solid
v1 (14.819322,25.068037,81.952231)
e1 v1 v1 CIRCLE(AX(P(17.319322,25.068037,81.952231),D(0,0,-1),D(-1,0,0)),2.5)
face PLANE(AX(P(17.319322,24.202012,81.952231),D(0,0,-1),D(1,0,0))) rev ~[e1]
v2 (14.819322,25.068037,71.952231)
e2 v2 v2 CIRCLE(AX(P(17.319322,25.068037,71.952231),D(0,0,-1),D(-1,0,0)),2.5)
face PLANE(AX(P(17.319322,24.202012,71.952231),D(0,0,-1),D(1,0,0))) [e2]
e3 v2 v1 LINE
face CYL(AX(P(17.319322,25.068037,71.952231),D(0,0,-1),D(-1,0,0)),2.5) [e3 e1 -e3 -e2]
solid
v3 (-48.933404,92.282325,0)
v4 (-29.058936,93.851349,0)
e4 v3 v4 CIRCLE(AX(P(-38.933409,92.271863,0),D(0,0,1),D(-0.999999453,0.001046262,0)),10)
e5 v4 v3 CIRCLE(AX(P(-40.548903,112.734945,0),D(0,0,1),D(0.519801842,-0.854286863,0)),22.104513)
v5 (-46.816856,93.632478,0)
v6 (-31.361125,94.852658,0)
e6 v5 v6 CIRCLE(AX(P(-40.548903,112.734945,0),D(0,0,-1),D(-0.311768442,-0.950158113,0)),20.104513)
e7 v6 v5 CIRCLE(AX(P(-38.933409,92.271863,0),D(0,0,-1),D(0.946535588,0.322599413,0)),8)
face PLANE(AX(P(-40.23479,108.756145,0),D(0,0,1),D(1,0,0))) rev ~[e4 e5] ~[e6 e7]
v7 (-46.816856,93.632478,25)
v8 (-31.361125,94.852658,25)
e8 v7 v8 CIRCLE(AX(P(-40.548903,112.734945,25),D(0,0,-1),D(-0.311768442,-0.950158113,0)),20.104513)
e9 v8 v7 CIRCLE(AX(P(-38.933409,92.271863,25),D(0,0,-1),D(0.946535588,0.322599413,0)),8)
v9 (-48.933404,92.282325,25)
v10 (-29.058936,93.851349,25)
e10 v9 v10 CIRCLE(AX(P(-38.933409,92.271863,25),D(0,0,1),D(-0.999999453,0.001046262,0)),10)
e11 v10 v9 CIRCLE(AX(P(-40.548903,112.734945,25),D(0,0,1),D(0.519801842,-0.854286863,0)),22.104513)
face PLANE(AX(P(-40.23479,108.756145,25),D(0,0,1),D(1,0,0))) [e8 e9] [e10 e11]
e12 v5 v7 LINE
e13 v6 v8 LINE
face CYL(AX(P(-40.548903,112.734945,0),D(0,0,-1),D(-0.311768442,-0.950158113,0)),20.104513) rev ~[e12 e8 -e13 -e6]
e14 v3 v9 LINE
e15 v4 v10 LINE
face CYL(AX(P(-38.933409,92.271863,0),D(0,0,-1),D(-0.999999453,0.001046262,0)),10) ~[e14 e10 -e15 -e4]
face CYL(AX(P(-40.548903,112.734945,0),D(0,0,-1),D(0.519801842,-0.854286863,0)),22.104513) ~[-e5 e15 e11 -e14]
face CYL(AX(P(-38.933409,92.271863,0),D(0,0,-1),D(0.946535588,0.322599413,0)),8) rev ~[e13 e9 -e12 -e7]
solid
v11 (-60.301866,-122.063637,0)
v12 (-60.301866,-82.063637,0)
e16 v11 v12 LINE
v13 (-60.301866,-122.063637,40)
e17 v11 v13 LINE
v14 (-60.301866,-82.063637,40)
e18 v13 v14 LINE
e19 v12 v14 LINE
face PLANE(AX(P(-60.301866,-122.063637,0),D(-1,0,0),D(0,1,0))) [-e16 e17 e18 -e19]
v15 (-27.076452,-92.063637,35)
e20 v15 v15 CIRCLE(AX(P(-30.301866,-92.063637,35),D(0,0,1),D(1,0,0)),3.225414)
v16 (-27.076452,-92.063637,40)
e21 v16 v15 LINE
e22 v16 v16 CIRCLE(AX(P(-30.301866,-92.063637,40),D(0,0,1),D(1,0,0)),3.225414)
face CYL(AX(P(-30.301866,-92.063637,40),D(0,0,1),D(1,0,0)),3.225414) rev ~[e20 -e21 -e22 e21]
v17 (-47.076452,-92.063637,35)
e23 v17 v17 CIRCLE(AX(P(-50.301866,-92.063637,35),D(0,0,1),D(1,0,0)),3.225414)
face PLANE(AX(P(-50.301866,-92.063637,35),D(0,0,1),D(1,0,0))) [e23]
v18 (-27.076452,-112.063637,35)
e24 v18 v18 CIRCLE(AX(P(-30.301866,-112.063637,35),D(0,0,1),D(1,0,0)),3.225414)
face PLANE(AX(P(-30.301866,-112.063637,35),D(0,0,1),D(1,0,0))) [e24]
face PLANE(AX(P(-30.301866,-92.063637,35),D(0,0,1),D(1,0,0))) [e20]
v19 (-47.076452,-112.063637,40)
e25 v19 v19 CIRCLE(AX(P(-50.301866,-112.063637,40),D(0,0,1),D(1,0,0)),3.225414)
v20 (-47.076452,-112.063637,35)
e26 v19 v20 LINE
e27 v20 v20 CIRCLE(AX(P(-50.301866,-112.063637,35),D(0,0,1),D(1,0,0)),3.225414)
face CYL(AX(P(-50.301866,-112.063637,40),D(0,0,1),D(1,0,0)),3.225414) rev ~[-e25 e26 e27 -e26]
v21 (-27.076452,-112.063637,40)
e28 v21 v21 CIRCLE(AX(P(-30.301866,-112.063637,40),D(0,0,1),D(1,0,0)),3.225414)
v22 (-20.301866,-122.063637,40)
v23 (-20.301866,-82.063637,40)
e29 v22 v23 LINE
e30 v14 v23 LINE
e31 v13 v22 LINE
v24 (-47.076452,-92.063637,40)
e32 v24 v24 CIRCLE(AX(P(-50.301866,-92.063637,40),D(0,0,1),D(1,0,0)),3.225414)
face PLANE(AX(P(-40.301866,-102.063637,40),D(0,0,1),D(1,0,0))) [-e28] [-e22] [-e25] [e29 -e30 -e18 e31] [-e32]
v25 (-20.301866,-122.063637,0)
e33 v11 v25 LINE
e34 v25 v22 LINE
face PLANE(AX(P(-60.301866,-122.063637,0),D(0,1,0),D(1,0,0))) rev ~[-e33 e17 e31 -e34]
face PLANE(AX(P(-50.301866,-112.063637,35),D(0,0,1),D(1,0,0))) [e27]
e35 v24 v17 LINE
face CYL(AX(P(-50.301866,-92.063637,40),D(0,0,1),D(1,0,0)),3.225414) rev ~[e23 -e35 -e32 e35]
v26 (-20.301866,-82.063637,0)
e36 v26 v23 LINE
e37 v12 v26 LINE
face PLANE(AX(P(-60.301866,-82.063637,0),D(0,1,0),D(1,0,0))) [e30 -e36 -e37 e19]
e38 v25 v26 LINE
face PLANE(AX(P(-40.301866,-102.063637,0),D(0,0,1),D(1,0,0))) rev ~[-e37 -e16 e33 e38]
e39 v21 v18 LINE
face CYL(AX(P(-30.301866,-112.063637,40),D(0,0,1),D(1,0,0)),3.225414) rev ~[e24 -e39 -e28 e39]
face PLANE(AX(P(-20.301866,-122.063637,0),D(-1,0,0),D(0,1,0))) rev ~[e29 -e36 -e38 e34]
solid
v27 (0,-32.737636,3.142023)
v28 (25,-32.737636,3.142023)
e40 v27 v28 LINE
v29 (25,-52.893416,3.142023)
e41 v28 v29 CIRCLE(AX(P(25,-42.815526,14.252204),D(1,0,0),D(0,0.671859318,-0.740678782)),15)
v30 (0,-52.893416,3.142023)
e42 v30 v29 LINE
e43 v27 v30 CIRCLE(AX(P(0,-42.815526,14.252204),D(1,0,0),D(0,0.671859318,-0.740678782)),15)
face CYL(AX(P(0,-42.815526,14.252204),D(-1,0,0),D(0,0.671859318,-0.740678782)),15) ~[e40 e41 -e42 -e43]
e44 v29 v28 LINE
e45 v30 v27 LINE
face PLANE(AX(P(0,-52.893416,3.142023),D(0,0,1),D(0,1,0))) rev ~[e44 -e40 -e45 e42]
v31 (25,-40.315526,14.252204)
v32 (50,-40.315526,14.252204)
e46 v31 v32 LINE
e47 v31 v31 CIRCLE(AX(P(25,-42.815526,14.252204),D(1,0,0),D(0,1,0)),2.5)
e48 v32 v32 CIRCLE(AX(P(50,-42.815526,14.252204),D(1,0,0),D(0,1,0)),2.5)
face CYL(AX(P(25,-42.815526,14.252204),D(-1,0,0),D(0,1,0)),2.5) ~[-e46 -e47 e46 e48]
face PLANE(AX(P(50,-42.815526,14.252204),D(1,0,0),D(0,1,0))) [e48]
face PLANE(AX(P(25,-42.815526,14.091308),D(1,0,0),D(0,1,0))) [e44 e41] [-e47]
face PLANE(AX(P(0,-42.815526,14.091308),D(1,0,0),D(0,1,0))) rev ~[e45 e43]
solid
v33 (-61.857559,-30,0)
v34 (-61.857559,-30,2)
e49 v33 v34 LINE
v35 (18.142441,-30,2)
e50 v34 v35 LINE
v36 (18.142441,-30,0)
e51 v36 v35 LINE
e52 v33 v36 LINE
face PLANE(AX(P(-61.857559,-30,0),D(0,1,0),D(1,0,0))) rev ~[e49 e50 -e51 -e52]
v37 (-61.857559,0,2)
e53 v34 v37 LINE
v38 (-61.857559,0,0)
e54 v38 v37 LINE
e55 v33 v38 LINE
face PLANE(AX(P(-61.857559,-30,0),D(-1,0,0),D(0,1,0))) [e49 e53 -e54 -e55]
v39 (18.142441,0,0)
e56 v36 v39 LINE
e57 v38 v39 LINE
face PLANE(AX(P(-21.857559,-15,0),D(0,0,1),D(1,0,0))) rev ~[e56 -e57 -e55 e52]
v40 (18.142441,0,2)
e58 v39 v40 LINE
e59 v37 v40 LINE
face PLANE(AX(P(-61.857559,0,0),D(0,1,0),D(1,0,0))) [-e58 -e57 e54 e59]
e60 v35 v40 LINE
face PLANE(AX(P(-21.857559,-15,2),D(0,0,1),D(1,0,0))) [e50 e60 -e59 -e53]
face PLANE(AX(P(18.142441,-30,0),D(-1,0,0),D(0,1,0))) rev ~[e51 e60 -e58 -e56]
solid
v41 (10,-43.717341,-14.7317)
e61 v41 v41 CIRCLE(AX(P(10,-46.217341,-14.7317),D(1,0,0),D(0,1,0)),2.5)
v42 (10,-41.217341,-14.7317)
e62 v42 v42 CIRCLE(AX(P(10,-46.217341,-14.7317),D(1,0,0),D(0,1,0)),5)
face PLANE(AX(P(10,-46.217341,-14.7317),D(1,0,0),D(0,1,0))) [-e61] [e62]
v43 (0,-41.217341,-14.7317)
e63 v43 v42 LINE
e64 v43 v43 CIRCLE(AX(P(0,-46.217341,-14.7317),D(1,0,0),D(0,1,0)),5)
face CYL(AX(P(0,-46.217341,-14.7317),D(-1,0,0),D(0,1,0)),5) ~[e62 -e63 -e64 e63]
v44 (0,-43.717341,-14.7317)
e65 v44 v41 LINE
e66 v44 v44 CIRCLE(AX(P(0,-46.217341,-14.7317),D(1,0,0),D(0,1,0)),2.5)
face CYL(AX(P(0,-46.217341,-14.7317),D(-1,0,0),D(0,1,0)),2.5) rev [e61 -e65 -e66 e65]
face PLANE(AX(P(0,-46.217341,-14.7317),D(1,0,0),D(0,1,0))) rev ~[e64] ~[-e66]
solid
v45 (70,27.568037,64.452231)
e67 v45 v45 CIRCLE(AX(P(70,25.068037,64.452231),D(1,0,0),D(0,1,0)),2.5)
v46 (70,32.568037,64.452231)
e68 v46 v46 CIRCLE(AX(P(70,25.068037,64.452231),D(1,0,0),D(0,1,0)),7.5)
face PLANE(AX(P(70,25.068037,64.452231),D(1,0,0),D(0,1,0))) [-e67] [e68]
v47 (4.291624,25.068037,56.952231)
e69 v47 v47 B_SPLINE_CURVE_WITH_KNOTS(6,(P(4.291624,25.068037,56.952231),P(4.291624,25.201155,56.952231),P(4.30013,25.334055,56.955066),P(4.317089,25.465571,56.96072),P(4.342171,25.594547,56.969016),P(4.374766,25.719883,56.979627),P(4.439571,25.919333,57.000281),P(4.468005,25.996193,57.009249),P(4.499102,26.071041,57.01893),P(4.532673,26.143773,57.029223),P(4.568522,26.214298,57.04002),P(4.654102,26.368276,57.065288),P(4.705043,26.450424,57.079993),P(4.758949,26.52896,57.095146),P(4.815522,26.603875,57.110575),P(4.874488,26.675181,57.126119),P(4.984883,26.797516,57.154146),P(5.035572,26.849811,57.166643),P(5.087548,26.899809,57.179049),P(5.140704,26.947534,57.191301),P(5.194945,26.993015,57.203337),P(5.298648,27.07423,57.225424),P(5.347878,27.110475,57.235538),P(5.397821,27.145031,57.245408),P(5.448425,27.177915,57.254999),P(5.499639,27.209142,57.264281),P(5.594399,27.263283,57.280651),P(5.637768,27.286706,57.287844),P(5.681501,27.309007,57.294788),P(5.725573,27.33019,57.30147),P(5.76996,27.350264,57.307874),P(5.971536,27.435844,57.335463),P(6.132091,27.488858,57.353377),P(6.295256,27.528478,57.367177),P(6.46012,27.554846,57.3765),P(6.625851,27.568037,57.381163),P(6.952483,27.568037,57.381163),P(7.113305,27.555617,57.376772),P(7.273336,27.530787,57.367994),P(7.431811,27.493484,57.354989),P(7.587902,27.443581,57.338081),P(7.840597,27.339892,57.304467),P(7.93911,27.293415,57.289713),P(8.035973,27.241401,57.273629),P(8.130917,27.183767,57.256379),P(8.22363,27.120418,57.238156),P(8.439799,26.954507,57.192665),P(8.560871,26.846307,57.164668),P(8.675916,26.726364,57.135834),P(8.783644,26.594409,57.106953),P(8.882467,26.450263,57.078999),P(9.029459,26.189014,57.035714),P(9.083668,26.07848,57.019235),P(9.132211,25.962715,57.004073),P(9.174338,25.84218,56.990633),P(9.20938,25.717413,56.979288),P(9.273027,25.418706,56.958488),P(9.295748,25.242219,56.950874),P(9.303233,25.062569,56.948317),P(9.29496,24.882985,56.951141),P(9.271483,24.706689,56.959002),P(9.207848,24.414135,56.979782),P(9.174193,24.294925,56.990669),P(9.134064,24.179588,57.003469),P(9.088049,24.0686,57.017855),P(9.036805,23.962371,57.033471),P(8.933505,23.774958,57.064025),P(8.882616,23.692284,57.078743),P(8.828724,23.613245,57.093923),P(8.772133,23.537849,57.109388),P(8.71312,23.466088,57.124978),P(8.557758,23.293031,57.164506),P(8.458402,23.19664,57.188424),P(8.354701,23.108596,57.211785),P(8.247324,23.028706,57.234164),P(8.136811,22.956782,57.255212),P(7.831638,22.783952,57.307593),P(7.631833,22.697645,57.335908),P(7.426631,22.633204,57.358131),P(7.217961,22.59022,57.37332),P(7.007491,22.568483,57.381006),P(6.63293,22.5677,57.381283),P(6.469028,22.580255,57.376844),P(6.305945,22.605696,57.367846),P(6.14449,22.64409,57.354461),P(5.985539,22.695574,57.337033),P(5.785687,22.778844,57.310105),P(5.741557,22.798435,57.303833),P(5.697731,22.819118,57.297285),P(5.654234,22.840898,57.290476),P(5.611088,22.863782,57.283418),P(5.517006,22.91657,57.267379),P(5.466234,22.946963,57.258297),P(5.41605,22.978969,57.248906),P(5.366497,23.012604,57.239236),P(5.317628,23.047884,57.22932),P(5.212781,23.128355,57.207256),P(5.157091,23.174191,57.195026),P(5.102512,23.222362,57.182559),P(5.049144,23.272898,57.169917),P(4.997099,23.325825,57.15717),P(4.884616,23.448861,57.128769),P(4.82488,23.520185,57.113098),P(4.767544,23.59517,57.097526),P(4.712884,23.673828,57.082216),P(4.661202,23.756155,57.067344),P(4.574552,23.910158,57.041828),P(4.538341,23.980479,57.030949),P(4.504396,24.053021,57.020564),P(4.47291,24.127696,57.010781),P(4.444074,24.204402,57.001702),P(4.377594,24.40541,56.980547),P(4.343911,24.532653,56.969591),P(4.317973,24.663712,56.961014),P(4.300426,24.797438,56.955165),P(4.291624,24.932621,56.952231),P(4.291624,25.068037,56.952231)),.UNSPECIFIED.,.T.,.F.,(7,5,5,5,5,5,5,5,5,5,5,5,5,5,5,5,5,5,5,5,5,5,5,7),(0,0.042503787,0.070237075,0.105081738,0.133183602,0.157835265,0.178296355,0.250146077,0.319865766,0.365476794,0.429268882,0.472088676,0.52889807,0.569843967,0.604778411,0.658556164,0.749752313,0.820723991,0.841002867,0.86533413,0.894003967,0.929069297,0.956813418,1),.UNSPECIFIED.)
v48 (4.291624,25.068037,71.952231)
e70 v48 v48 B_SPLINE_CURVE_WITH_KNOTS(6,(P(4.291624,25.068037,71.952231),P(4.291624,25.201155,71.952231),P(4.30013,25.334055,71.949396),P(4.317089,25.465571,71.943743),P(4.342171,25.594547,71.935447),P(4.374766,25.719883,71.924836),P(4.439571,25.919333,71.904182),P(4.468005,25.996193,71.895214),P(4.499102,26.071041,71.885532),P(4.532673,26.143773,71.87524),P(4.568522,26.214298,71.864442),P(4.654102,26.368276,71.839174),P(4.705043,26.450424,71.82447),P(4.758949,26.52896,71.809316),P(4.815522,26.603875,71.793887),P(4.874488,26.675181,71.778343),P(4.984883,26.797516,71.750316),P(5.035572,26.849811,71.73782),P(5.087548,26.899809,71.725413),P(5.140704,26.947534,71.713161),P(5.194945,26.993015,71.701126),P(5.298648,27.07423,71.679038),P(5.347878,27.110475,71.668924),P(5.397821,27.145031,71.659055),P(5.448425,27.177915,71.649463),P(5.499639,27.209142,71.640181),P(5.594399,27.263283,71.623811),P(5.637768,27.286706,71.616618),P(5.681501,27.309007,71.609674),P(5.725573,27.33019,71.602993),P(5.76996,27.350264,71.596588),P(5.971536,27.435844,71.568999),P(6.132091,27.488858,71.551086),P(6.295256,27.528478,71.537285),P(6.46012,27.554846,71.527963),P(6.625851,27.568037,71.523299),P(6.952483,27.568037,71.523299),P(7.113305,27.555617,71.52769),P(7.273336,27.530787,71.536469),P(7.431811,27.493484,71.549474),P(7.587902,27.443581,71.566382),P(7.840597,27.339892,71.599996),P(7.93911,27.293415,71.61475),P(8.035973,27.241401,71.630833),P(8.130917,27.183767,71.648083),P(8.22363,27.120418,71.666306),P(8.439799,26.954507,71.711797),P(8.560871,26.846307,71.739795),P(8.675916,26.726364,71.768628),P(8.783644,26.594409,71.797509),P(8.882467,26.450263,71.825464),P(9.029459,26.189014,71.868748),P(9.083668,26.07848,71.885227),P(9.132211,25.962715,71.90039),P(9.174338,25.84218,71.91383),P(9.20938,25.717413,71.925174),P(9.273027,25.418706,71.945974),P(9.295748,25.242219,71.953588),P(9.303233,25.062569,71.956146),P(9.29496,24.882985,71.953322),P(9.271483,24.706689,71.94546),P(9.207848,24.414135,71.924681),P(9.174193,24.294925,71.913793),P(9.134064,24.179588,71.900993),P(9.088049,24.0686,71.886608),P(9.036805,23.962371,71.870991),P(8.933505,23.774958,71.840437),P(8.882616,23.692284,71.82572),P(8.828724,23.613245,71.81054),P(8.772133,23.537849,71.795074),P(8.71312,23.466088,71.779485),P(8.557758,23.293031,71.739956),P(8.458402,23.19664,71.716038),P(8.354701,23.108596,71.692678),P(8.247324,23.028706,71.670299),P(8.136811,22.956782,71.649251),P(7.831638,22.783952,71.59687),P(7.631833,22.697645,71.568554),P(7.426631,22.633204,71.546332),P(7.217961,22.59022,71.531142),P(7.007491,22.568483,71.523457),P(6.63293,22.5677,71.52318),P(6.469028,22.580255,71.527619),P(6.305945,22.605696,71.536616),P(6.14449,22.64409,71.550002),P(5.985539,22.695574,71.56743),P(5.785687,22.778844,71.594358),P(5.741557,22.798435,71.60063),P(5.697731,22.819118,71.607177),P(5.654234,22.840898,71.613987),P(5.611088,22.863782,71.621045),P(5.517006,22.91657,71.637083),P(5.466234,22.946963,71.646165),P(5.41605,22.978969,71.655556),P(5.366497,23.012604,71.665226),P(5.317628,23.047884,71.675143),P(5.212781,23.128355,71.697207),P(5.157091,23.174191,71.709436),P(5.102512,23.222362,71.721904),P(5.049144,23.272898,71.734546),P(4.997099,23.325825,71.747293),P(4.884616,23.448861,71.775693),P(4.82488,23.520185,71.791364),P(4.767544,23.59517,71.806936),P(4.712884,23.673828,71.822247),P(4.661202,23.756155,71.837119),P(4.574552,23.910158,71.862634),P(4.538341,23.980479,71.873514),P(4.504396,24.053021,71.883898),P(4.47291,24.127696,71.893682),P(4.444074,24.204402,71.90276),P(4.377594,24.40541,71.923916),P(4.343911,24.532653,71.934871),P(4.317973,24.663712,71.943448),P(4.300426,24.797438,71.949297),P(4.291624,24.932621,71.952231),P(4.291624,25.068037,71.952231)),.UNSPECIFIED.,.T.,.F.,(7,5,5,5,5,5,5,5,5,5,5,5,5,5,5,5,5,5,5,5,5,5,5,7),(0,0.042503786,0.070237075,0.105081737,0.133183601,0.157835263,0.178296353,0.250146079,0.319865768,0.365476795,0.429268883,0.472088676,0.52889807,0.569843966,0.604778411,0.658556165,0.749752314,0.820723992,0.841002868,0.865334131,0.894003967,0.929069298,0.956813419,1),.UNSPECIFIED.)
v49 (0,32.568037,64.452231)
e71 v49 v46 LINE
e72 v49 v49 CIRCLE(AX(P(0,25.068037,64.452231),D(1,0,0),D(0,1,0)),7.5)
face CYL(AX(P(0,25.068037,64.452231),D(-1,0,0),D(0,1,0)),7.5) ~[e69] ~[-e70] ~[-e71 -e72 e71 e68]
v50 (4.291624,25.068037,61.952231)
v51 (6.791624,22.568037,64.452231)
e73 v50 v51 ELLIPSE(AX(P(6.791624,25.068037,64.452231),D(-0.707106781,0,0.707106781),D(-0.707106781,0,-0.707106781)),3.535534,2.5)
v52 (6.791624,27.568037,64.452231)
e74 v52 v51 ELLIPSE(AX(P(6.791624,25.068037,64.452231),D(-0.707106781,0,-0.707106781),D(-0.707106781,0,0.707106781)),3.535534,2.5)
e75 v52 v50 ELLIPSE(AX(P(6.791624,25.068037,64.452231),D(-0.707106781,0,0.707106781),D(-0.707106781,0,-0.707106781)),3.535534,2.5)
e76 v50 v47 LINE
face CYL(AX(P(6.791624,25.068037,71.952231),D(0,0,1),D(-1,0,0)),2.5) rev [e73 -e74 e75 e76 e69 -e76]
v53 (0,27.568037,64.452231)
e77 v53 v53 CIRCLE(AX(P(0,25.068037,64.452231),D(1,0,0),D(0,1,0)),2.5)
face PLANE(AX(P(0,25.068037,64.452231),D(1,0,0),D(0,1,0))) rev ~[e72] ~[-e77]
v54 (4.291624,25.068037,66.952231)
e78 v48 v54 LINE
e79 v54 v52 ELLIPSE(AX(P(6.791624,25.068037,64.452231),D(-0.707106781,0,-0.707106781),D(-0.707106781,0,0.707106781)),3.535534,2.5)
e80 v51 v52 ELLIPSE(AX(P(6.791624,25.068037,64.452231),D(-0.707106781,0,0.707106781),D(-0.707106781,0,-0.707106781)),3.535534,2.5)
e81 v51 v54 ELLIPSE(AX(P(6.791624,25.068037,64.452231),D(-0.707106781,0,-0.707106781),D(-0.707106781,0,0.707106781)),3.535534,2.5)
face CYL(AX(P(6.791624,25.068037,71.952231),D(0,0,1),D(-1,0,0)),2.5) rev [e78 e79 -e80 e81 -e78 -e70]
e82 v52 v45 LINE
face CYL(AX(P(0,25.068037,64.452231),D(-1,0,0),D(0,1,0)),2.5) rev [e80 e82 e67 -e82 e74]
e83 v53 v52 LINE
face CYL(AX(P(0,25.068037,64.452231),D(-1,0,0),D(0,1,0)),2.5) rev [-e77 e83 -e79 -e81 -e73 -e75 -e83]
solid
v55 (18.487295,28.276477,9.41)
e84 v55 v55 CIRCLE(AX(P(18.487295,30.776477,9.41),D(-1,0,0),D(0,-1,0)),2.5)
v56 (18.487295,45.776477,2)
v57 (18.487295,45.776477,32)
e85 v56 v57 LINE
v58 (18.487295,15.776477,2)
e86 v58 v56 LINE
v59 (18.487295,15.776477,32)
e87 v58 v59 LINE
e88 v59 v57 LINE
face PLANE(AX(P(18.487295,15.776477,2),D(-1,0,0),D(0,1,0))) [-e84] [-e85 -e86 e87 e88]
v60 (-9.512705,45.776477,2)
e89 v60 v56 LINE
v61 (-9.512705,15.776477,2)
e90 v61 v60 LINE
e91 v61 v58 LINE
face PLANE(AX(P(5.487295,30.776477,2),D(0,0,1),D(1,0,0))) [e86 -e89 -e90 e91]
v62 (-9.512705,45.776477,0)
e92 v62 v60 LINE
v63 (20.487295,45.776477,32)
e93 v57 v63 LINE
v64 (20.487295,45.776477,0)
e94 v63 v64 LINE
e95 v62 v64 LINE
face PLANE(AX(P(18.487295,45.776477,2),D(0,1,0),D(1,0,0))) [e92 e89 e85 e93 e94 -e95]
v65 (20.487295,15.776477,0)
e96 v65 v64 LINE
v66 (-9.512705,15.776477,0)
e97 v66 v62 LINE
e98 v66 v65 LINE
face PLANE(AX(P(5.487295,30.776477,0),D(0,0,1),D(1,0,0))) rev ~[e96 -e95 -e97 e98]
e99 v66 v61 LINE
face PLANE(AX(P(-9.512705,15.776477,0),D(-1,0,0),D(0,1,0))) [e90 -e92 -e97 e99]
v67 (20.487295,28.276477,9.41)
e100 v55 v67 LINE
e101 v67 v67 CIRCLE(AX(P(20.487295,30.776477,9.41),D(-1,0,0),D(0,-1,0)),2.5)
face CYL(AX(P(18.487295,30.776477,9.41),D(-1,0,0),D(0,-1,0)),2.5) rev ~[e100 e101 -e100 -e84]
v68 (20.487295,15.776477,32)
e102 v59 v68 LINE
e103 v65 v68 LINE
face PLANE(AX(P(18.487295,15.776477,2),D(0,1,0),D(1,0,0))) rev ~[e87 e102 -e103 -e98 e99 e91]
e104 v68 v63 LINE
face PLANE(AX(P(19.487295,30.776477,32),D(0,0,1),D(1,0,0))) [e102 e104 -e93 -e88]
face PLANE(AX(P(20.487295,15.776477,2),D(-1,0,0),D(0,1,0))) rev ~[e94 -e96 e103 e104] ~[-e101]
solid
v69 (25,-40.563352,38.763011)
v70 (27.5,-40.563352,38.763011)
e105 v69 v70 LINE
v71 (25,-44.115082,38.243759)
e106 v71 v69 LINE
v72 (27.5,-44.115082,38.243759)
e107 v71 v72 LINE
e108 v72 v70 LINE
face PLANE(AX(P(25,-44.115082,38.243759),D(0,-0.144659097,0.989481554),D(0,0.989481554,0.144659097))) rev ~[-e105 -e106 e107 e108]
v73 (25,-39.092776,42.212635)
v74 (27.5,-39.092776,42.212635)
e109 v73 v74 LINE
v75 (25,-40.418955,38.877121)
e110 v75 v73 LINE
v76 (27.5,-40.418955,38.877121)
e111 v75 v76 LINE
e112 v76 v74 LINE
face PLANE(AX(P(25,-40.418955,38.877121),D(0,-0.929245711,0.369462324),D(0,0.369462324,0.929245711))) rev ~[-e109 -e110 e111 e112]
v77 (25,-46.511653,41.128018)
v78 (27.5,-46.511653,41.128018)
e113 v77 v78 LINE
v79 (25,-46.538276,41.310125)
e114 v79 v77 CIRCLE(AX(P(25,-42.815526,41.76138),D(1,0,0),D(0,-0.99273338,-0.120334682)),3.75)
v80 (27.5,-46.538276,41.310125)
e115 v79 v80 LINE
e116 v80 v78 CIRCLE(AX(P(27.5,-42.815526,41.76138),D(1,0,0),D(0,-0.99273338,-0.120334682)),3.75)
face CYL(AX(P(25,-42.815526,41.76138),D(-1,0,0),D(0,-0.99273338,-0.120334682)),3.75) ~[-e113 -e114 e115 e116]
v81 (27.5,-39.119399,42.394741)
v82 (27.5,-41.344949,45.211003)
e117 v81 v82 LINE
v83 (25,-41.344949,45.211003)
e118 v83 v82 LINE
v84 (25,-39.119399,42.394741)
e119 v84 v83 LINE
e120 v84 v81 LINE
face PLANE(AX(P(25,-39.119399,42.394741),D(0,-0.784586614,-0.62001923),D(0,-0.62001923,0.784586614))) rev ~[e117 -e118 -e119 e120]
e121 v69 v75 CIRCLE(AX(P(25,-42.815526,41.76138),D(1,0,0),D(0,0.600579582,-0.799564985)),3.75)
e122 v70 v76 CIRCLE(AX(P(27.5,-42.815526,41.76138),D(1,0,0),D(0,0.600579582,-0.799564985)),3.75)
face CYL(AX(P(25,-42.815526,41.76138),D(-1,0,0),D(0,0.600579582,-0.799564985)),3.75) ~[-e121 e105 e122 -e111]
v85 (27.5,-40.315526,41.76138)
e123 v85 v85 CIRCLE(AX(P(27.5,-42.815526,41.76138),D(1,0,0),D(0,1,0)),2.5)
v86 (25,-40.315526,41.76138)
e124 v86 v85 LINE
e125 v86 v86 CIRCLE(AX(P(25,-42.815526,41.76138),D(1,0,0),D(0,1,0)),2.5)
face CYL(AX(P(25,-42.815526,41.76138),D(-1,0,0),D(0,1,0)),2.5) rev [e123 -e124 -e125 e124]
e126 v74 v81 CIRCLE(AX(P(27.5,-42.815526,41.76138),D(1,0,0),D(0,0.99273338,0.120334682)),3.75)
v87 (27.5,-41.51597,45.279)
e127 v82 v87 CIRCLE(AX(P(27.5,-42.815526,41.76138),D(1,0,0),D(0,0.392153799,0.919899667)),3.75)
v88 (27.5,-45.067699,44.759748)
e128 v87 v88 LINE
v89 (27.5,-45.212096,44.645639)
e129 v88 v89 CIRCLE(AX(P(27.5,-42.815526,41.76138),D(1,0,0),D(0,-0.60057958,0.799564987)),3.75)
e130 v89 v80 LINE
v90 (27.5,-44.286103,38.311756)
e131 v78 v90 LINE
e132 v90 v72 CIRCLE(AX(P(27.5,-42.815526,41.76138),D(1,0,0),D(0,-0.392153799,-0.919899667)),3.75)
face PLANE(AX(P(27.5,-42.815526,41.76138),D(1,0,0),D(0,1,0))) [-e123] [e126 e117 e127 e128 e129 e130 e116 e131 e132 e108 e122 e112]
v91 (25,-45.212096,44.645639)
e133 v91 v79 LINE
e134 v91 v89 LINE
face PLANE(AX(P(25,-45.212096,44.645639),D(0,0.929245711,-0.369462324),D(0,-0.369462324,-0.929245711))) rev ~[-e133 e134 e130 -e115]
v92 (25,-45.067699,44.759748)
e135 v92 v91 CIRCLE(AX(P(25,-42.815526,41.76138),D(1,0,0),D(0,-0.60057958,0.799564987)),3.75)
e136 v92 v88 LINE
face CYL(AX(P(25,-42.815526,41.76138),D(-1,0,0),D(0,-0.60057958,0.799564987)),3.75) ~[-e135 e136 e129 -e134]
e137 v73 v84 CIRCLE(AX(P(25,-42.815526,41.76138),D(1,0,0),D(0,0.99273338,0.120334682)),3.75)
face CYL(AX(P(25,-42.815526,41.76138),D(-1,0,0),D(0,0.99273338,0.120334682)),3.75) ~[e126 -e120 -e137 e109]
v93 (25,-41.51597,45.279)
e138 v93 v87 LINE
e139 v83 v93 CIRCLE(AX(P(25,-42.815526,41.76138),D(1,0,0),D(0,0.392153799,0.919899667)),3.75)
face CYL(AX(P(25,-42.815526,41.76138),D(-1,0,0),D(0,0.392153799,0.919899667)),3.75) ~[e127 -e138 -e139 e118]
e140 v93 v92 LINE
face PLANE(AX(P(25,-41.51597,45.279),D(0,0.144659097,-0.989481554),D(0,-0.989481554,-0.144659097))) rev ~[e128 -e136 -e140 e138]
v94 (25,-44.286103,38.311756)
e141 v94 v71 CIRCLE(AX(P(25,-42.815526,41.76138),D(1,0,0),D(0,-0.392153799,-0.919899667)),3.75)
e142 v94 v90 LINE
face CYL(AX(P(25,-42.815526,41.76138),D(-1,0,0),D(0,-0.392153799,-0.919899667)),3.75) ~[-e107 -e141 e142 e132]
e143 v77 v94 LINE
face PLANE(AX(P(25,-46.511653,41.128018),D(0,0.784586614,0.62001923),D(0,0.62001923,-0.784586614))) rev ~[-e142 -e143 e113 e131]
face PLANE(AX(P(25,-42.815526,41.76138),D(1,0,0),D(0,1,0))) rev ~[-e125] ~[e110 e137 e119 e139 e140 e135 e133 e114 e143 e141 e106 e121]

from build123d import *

# Parameters (mm, degrees)
F0_W      = 30
F0_H      = 30
F1_DEPTH  = 2
F2_W      = 2
F2_H      = 30
F3_DEPTH  = 30
F5_DEPTH  = 25
F6_R      = 2.5
F7_DEPTH  = 25
F8_R      = 2.5
F9_DEPTH  = 2
F0_W_2    = 80
F10_DEPTH = 2
F12_DEPTH = 2.5
F4_R      = 5
F4_R_2    = 2.5
F13_DEPTH = 10
F14_DEPTH = 25
F0_W_3    = 40
F0_H_2    = 40
F15_DEPTH = 40
F16_R     = 3.2254140047
F17_DEPTH = 5
F18_R     = 2.5
F19_DEPTH = 70
F22_DEPTH = 91.6849308292
F23_DEPTH = 10


# Not quite as in the source:
# - a feature names something its author has since deleted; it is built from what else it names


with BuildPart() as f1:
    # F0 (on Top) → F1 (new body)
    with BuildSketch(Plane.XY):
        with Locations((5.4872950528, 30.7764774188)):
            Rectangle(F0_W, F0_H)
    extrude(amount=F1_DEPTH)

    # F2 (on face) → F3 (join)
    with BuildSketch(Plane.XY.offset(2)):
        with Locations((19.4872950528, 30.7764774188)):
            Rectangle(F2_W, F2_H)
    extrude(amount=F3_DEPTH)

    # F8 (on face) → F9 (cut, through all)
    with BuildSketch(Plane(origin=(18.4872950528, 0, 0), x_dir=(0, -1, 0), z_dir=(-1, 0, 0))):
        with Locations((-30.7764774188, 9.41)):
            Circle(F8_R)
    extrude(amount=-F9_DEPTH, mode=Mode.SUBTRACT)


with BuildPart() as f5:
    # F4 (on Right) → F5 (new body)
    with BuildSketch(Plane.YZ):
        with BuildLine():
            Line((-52.8934156308, 3.1420226926), (-32.7376361042, 3.1420226926))
            ThreePointArc((-32.7376361042, 3.1420226926), (-42.8155258675, 29.2522044156), (-52.8934156308, 3.1420226926))
        make_face()
    extrude(amount=F5_DEPTH)

    # F6 (on face) → F7 (join)
    with BuildSketch(Plane.YZ.offset(25)):
        with Locations((-42.8155258675, 14.2522044156)):
            Circle(F6_R)
    extrude(amount=F7_DEPTH)


with BuildPart() as f10:
    # F0 (on Top) → F10 (new body)
    with BuildSketch(Plane.XY):
        with Locations((-21.8575587869, -15)):
            Rectangle(F0_W_2, F0_H)
    extrude(amount=F10_DEPTH)


with BuildPart() as f12:
    # F6 (on face) → F12 (new body)
    with BuildSketch(Plane.YZ.offset(25)):
        with BuildLine():
            Line((-39.1193990775, 42.3947411596), (-41.3449491195, 45.2110034407))
            ThreePointArc((-41.3449491195, 45.2110034407), (-41.4300421528, 45.2460511048), (-41.5159695959, 45.27900012))
            Line((-41.5159695959, 45.27900012), (-45.0676992959, 44.7597483868))
            ThreePointArc((-45.0676992959, 44.7597483868), (-45.1405979801, 44.7035794904), (-45.2120963858, 44.6456386494))
            Line((-45.2120963858, 44.6456386494), (-46.538276044, 41.3101246351))
            ThreePointArc((-46.538276044, 41.3101246351), (-46.5260816948, 41.2189080745), (-46.5116526575, 41.1280182183))
            Line((-46.5116526575, 41.1280182183), (-44.2861026155, 38.3117559373))
            ThreePointArc((-44.2861026155, 38.3117559373), (-44.2010095822, 38.2767082732), (-44.1150821391, 38.2437592579))
            Line((-44.1150821391, 38.2437592579), (-40.563352439, 38.7630109911))
            ThreePointArc((-40.563352439, 38.7630109911), (-40.4904537549, 38.8191798876), (-40.4189553491, 38.8771207286))
            Line((-40.4189553491, 38.8771207286), (-39.092775691, 42.2126347428))
            ThreePointArc((-39.092775691, 42.2126347428), (-39.1049700402, 42.3038513034), (-39.1193990775, 42.3947411596))
        make_face()
        with Locations((-42.8155258675, 41.761379689)):
            Circle(F6_R, mode=Mode.SUBTRACT)
    extrude(amount=F12_DEPTH)


with BuildPart() as f13:
    # F4 (on Right) → F13 (new body)
    with BuildSketch(Plane.YZ):
        with Locations((-46.217340976, -14.7316996008)):
            Circle(F4_R)
        with Locations((-46.217340976, -14.7316996008)):
            Circle(F4_R_2, mode=Mode.SUBTRACT)
    extrude(amount=F13_DEPTH)


with BuildPart() as f14:
    # F0 (on Top) → F14 (new body)
    with BuildSketch(Plane.XY):
        with BuildLine():
            ThreePointArc((-29.0589361801, 93.8513494414), (-42.2885690725, 134.7708941054), (-48.9334039126, 92.2823251494))
            ThreePointArc((-48.9334039126, 92.2823251494), (-38.1463908298, 82.3028805443), (-29.0589361801, 93.8513494414))
        make_face()
        with BuildLine():
            ThreePointArc((-46.8168556195, 93.6324783746), (-42.1311653612, 132.7770977087), (-31.361124685, 94.8526578336))
            ThreePointArc((-31.361124685, 94.8526578336), (-38.303794541, 84.2966769411), (-46.8168556195, 93.6324783746))
        make_face(mode=Mode.SUBTRACT)
    extrude(amount=F14_DEPTH)


with BuildPart() as f15:
    # F0 (on Top) → F15 (new body)
    with BuildSketch(Plane.XY):
        with Locations((-40.3018663824, -102.0636367798)):
            Rectangle(F0_W_3, F0_H_2)
    extrude(amount=F15_DEPTH)

    # F16 (on face) → F17 (cut)
    with BuildSketch(Plane.XY.offset(40)):
        with Locations((-50.3018663824, -112.0636367798)):
            Circle(F16_R)
        with Locations((-30.3018663824, -112.0636367798)):
            Circle(F16_R)
        with Locations((-30.3018663824, -92.0636367798)):
            Circle(F16_R)
        with Locations((-50.3018663824, -92.0636367798)):
            Circle(F16_R)
    extrude(amount=-F17_DEPTH, mode=Mode.SUBTRACT)


with BuildPart() as f19:
    # F18 (on Right) → F19 (new body)
    with BuildSketch(Plane.YZ):
        with BuildLine():
            ThreePointArc((25.0680372119, 71.9522312284), (19.764736353, 59.1489303695), (32.5680372119, 64.4522312284))
            ThreePointArc((32.5680372119, 64.4522312284), (30.3713380708, 69.7555320873), (25.0680372119, 71.9522312284))
        make_face()
        with Locations((25.0680372119, 64.4522312284)):
            Circle(F18_R, mode=Mode.SUBTRACT)
    extrude(amount=F19_DEPTH)

    # F21 (on face) → F22 (cut, through all)
    with BuildSketch(Plane(origin=(0, 0, 71.9522312284), x_dir=(1, 0, 0), z_dir=(0, 0, -1))):
        with BuildLine():
            Line((4.2916242406, -25.0680372119), (9.2916242406, -25.0680372119))
            ThreePointArc((9.2916242406, -25.0680372119), (6.7916242406, -22.5680372119), (4.2916242406, -25.0680372119))
        make_face()
        with BuildLine():
            ThreePointArc((4.2916242406, -25.0680372119), (6.7916242406, -27.5680372119), (9.2916242406, -25.0680372119))
            Line((9.2916242406, -25.0680372119), (4.2916242406, -25.0680372119))
        make_face()
    extrude(amount=F22_DEPTH, mode=Mode.SUBTRACT)


with BuildPart() as f23:
    # F21 (on face) → F23 (new body)
    with BuildSketch(Plane(origin=(0, 0, 71.9522312284), x_dir=(1, 0, 0), z_dir=(0, 0, -1))):
        with BuildLine():
            ThreePointArc((19.8193216324, -25.0680372119), (17.3193216324, -22.5680372119), (14.8193216324, -25.0680372119))
            Line((14.8193216324, -25.0680372119), (19.8193216324, -25.0680372119))
        make_face()
        with BuildLine():
            Line((19.8193216324, -25.0680372119), (14.8193216324, -25.0680372119))
            ThreePointArc((14.8193216324, -25.0680372119), (17.3193216324, -27.5680372119), (19.8193216324, -25.0680372119))
        make_face()
    extrude(amount=-F23_DEPTH)


solid = Compound([f1.part, f5.part, f10.part, f12.part, f13.part, f14.part, f15.part, f19.part, f23.part])
